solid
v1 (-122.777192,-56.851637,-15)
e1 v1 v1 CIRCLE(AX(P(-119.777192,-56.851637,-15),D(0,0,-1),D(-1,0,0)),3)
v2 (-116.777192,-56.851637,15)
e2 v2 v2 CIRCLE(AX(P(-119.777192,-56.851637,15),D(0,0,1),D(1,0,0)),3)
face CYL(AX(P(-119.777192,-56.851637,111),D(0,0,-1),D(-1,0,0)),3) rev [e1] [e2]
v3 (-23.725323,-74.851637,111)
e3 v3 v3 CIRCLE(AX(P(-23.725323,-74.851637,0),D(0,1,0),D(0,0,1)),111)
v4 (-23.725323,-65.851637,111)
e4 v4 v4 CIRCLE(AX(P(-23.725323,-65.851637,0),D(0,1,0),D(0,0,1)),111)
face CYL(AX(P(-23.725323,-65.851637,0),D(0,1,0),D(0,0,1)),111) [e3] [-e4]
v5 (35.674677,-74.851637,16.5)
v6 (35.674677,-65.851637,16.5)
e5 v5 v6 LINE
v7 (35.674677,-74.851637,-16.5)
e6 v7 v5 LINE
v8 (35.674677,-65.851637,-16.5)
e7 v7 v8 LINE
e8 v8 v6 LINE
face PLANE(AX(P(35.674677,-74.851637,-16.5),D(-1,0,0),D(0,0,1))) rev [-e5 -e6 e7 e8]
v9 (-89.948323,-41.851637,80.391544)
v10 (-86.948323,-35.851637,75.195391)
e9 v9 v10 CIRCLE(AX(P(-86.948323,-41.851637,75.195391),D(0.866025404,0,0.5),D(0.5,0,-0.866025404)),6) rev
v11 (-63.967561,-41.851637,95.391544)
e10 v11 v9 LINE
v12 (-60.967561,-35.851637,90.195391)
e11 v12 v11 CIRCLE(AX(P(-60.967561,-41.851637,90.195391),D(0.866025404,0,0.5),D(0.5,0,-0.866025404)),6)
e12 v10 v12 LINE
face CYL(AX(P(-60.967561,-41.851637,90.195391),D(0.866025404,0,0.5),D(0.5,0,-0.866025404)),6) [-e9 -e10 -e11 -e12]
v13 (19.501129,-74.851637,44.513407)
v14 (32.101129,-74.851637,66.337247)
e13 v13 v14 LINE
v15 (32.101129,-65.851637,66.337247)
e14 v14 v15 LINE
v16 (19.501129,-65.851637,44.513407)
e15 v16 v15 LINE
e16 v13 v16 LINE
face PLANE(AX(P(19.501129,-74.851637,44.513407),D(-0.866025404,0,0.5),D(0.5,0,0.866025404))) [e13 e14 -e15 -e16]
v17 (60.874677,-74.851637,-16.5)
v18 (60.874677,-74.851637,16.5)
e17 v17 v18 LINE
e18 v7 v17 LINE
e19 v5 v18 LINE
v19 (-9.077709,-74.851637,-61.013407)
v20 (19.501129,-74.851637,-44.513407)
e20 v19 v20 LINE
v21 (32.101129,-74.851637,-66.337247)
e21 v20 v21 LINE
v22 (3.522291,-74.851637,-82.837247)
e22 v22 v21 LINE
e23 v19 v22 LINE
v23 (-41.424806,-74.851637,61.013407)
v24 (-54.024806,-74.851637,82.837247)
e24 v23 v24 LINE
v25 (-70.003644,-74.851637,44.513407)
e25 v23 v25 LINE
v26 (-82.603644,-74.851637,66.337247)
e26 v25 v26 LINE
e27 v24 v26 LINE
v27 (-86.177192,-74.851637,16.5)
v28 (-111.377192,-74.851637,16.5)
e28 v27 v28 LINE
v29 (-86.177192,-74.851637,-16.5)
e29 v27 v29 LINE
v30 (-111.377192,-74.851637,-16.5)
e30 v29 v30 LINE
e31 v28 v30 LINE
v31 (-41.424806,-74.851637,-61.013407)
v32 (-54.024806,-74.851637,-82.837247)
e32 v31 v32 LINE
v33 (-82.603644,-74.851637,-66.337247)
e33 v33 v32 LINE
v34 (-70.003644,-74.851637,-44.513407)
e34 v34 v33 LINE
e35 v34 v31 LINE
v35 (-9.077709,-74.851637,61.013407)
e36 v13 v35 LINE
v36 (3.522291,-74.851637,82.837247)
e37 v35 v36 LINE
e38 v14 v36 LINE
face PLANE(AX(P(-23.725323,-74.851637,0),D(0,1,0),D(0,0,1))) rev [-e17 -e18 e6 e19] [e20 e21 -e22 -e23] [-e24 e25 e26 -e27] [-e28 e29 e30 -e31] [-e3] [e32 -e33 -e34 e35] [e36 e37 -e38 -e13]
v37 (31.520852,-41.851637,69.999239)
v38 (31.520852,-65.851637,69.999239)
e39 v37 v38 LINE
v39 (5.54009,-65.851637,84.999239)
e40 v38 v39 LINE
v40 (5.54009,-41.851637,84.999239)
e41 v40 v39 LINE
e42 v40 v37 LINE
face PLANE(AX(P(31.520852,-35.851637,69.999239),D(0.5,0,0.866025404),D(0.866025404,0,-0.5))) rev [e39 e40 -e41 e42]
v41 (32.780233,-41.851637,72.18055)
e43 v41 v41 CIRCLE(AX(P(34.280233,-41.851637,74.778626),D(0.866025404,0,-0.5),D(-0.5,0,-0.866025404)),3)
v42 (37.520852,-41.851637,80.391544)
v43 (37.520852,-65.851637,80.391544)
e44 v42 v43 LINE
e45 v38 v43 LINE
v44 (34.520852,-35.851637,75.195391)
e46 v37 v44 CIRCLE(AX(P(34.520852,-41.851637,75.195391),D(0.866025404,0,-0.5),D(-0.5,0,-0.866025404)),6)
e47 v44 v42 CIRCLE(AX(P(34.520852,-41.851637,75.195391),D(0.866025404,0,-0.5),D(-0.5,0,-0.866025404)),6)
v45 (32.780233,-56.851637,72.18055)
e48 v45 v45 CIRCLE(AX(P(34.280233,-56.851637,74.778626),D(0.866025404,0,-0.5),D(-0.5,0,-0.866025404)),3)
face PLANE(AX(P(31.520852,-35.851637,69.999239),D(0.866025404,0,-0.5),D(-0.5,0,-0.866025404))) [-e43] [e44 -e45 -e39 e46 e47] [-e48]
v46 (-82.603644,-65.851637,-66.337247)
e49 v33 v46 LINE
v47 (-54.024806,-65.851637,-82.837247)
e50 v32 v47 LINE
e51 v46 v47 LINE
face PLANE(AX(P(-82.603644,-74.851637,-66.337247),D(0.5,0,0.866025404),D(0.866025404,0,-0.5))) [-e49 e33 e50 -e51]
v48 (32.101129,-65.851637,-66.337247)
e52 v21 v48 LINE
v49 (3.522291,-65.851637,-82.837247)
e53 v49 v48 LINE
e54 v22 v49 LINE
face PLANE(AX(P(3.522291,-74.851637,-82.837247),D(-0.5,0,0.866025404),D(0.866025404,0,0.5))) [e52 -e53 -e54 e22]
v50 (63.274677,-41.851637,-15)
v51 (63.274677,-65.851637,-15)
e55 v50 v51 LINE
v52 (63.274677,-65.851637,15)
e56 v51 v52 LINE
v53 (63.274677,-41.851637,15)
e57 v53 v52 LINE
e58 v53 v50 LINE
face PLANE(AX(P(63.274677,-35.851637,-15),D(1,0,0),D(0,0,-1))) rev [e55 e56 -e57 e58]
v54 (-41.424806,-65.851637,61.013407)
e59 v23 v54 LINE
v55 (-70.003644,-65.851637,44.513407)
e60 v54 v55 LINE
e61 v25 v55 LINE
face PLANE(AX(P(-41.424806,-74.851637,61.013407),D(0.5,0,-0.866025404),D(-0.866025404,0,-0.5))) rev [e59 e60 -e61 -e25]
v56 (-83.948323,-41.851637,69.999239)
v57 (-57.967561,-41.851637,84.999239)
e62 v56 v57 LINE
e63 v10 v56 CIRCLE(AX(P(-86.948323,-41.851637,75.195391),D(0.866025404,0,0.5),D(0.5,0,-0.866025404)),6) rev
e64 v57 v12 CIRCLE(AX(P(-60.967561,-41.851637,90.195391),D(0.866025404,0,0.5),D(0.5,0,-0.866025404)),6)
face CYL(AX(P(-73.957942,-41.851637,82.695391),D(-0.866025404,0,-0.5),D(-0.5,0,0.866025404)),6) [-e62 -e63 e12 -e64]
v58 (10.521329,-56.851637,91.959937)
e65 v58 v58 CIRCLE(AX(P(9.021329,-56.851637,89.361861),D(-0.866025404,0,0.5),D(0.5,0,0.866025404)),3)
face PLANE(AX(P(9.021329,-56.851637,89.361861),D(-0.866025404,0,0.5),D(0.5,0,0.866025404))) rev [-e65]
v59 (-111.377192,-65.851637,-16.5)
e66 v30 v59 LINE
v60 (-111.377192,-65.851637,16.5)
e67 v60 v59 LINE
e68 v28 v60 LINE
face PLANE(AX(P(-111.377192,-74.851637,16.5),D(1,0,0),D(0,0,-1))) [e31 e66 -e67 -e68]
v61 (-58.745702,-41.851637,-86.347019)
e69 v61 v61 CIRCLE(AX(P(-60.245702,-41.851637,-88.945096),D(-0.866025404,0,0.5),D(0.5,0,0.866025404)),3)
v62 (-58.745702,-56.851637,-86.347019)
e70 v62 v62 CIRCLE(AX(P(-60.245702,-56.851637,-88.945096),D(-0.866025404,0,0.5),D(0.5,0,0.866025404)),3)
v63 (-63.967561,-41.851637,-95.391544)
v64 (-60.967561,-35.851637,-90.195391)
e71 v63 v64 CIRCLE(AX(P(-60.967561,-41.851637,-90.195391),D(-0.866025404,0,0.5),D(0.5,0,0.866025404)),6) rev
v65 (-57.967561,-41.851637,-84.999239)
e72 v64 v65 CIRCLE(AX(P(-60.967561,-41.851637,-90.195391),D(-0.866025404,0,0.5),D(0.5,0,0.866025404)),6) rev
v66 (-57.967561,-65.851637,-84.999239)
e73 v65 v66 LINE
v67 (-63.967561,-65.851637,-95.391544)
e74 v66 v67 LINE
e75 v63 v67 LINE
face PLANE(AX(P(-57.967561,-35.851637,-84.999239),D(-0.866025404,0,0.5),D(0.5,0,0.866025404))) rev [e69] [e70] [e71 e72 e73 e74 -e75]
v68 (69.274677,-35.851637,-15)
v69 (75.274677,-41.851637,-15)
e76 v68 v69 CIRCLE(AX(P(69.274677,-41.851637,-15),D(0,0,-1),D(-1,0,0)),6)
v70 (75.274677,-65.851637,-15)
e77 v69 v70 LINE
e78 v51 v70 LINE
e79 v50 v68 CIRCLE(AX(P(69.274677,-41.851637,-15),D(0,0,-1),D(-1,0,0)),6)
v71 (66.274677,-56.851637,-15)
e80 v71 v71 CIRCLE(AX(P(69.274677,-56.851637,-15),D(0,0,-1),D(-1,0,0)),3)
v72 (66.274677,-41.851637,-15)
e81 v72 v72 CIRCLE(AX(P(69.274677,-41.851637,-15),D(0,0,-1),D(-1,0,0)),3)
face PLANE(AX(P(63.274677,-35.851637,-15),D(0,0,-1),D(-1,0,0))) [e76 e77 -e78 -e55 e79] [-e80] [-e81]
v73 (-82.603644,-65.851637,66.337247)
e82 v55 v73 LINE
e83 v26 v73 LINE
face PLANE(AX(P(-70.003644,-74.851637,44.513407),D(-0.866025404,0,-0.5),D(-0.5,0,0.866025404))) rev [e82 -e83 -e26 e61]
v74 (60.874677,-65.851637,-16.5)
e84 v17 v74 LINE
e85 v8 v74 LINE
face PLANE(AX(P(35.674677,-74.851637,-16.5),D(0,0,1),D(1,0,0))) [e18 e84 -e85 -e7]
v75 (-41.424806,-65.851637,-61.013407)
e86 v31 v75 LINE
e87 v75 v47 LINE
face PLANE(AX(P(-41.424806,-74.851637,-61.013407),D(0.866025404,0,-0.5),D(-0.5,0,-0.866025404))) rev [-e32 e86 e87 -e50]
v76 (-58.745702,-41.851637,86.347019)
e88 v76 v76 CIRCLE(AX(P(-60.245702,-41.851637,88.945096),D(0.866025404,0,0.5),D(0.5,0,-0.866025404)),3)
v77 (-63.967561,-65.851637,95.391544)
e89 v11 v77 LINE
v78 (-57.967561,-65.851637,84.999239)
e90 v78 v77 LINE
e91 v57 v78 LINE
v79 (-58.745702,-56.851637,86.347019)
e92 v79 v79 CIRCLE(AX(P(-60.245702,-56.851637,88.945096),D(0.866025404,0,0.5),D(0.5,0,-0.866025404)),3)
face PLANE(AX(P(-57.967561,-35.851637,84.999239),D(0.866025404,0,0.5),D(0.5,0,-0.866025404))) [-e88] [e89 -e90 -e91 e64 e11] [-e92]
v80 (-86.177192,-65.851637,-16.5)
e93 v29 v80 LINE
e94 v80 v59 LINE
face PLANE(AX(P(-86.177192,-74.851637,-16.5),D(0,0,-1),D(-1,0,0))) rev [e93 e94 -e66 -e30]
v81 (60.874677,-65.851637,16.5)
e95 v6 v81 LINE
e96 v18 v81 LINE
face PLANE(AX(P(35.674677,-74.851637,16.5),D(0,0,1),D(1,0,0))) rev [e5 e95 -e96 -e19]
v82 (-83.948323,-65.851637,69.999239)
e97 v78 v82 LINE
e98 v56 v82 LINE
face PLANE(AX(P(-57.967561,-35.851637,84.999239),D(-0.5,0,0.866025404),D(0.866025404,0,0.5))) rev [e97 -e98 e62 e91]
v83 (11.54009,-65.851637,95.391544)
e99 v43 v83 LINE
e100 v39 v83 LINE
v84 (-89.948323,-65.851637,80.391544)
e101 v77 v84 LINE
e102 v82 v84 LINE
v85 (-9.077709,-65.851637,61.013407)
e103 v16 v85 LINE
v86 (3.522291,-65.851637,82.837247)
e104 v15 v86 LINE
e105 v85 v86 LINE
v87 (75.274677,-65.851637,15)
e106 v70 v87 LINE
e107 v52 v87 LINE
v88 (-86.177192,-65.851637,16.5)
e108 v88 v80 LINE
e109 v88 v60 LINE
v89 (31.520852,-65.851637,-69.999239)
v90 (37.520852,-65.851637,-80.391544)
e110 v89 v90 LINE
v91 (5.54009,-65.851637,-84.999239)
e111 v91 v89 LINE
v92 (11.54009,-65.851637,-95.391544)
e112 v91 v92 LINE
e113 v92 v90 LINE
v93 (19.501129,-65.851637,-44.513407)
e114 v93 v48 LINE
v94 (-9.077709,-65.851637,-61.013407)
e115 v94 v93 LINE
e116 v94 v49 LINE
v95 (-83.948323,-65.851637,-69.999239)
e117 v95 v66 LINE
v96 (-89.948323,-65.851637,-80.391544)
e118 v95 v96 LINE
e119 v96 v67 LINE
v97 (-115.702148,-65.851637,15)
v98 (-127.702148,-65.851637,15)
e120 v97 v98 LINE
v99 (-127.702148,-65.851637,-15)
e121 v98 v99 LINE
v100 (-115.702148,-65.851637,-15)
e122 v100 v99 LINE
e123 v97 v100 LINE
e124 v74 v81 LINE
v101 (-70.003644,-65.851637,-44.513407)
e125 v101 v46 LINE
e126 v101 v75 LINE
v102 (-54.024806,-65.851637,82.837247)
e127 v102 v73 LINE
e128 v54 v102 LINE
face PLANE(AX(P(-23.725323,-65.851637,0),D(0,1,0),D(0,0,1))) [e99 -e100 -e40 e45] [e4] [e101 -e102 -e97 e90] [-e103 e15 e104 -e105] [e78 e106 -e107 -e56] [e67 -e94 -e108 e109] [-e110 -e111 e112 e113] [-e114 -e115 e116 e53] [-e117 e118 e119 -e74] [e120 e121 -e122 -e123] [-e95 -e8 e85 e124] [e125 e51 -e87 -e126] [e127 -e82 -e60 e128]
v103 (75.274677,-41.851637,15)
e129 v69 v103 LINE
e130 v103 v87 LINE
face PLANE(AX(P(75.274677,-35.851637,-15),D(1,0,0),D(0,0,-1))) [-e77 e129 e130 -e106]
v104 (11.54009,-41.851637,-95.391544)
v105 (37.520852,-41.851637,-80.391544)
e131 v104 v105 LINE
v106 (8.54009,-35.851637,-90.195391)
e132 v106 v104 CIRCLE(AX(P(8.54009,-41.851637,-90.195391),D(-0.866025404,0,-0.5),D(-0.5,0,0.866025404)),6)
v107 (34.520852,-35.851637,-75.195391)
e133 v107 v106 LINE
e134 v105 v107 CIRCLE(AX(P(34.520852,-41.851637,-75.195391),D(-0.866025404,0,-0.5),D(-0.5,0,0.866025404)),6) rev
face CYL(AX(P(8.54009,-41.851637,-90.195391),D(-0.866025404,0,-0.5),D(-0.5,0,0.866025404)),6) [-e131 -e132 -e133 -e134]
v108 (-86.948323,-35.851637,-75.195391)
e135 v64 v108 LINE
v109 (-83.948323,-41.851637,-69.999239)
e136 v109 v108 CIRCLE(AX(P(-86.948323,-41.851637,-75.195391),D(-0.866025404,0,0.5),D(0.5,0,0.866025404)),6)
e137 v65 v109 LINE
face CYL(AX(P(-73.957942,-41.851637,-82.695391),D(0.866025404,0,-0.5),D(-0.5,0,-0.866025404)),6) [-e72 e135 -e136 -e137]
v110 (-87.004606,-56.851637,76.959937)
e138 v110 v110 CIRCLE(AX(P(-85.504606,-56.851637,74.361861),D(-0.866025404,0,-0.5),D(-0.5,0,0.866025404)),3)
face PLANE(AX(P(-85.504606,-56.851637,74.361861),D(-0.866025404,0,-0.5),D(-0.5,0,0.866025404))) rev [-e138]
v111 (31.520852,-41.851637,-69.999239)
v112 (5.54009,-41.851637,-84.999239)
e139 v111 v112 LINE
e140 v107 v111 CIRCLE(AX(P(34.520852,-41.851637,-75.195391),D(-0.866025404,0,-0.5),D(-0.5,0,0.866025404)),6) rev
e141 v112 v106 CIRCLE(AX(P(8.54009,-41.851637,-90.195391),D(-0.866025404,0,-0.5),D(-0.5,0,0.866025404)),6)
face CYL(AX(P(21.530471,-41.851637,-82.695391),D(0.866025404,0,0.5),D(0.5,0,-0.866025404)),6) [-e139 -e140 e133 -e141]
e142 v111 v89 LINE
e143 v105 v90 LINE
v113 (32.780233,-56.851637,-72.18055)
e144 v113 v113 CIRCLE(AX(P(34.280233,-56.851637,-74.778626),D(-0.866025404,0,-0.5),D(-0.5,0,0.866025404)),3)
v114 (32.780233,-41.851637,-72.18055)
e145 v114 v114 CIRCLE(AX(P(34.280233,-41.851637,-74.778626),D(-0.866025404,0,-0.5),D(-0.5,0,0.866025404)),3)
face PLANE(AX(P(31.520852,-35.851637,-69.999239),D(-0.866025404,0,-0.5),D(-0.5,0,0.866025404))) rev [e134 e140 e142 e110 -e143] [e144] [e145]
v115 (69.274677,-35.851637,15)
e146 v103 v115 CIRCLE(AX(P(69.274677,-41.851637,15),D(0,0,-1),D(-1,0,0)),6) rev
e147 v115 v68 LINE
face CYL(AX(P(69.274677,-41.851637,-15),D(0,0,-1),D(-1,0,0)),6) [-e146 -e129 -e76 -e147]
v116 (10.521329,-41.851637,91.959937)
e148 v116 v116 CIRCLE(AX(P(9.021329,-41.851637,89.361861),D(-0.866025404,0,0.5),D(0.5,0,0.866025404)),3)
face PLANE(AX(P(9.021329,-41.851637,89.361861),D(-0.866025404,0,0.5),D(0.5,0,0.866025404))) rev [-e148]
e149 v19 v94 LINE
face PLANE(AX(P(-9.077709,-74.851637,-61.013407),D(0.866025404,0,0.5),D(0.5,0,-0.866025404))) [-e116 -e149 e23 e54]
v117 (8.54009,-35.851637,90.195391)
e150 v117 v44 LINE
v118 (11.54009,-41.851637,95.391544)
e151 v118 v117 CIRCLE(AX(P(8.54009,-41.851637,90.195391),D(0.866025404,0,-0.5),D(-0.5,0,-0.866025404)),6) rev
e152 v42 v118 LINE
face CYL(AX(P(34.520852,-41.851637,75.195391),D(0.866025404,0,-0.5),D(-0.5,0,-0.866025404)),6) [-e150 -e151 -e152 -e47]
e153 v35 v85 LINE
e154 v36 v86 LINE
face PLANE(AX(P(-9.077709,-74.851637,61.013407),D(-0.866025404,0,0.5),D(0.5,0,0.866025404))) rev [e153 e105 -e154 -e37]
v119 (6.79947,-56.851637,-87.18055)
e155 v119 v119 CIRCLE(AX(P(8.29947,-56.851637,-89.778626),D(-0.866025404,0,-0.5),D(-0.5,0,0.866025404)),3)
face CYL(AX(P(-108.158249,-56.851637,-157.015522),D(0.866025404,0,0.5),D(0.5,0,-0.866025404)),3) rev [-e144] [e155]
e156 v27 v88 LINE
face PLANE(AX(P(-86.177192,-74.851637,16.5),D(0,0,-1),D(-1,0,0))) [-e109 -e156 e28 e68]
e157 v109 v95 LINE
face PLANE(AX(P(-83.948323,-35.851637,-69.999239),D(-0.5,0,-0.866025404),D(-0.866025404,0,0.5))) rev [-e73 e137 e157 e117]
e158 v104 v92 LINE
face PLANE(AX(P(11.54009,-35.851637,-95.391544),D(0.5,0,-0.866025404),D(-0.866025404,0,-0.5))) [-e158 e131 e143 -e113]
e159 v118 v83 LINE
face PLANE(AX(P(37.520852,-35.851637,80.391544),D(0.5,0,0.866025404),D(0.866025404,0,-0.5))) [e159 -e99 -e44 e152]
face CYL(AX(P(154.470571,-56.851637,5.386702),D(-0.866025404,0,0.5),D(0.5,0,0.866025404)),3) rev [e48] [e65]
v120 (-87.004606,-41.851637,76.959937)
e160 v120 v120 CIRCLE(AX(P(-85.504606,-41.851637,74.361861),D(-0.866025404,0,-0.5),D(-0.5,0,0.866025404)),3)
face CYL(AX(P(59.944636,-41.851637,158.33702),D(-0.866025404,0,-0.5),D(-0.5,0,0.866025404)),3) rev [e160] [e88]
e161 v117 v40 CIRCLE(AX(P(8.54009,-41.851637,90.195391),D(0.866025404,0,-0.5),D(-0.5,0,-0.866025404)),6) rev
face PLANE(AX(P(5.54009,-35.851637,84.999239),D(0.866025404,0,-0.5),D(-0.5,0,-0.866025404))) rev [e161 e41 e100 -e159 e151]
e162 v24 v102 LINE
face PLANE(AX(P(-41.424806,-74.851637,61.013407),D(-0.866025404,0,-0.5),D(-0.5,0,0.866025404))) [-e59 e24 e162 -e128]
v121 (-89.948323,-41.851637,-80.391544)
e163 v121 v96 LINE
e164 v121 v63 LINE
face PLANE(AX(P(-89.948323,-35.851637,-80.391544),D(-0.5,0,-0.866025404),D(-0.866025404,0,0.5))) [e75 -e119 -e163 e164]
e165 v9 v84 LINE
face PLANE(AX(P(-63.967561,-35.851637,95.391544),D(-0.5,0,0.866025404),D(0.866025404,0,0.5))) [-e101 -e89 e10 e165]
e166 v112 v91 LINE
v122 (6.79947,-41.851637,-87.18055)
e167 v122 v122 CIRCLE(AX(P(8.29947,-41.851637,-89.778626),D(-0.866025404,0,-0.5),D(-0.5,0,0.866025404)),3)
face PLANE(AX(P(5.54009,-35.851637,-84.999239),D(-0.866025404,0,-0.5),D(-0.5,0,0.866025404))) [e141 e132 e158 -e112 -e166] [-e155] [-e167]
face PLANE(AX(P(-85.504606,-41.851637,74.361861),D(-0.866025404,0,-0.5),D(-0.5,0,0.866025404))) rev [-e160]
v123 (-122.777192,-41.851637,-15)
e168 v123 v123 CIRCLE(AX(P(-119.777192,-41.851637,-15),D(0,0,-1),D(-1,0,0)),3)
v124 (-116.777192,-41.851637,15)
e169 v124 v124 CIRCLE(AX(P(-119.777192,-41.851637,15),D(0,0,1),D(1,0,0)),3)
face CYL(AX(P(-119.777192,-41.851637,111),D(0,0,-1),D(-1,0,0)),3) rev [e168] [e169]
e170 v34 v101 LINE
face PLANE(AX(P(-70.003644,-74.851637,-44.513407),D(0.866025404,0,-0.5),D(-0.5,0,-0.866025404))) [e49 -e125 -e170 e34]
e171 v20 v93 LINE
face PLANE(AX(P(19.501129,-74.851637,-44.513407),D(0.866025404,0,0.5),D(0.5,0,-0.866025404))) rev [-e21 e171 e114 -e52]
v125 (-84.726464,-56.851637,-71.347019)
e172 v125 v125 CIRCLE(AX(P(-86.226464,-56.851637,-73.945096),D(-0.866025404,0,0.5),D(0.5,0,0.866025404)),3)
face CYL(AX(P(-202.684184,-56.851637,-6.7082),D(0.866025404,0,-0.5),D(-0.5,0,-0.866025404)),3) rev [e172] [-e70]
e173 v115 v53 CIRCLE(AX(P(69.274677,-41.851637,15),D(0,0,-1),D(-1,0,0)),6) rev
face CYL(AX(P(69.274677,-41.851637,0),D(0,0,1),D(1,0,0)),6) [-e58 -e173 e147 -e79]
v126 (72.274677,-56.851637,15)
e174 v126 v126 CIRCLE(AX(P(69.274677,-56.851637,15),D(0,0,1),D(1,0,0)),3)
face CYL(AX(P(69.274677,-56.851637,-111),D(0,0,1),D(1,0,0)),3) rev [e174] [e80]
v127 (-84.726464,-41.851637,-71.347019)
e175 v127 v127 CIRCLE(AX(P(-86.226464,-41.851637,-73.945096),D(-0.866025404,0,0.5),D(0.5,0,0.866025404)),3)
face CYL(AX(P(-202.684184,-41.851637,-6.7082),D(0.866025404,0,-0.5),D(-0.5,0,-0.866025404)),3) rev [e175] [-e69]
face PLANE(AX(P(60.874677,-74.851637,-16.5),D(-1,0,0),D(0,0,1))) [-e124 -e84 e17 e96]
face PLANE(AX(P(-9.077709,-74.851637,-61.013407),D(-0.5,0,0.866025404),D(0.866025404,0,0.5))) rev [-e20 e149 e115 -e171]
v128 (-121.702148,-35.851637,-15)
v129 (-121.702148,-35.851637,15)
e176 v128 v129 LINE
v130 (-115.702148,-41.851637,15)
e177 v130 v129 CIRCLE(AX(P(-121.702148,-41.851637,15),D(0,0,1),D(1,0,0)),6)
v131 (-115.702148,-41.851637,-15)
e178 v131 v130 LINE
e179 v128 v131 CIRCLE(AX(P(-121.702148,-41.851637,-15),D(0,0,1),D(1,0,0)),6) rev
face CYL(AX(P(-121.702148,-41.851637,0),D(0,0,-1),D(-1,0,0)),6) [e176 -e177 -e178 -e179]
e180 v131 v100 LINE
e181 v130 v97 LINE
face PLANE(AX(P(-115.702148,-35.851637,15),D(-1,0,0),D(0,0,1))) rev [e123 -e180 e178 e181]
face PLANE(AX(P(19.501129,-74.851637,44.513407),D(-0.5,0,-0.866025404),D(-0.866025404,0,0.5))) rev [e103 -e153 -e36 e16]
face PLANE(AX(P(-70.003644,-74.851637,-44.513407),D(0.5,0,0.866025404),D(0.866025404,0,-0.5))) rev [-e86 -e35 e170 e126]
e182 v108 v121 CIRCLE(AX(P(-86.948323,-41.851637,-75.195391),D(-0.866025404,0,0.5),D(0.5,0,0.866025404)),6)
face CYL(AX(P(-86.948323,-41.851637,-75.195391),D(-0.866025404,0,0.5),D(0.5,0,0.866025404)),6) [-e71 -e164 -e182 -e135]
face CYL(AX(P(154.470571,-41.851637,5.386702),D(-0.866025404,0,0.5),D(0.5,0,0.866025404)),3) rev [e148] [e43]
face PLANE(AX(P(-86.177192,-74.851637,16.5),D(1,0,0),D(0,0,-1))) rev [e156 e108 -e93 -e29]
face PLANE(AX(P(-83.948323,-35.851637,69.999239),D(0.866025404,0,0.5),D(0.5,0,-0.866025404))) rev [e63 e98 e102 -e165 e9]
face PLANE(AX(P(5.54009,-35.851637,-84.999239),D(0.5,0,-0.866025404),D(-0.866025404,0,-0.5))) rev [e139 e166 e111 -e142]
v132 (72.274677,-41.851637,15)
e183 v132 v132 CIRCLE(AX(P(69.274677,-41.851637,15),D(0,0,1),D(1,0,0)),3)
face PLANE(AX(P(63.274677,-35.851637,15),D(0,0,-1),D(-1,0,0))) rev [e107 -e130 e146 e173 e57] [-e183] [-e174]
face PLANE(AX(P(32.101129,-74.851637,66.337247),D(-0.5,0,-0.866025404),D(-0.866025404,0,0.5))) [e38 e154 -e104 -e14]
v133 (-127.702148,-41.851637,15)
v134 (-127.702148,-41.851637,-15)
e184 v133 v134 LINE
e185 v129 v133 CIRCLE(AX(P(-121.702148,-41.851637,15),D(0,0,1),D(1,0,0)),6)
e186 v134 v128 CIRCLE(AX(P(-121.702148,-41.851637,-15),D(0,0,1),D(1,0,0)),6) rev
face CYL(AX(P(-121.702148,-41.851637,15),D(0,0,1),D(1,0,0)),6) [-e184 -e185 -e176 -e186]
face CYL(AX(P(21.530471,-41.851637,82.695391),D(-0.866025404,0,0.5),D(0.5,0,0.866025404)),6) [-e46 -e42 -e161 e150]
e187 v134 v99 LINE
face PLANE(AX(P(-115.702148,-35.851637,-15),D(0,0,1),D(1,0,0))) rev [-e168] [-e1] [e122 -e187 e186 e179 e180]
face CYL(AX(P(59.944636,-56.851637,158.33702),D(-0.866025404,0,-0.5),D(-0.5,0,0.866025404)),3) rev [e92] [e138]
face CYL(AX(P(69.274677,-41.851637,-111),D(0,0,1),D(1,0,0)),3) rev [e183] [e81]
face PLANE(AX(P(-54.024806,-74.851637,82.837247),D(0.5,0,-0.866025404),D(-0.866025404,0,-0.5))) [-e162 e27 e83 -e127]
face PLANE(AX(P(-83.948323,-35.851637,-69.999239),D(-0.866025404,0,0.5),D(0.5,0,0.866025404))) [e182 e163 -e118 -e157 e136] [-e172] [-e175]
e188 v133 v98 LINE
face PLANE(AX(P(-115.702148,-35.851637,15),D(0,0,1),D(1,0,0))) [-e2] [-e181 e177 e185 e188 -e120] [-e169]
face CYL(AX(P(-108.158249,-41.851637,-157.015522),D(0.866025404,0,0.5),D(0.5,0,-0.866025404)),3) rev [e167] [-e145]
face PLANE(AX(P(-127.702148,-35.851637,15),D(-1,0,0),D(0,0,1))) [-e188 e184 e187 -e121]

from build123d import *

# Parameters (mm, degrees)
SKETCH_6_W                     = 111
SKETCH_6_H                     = 9
SKETCH_7_W                     = 12
SKETCH_7_H                     = 30
EXTRUDE_5_DEPTH                = 30
SKETCH_8_R                     = 3
CUT_EXTRUDE_2_DEPTH            = 200.07204757
FILLET_2_R                     = 6
SKETCH_9_W                     = 25.2
SKETCH_9_H                     = 33
CUT_EXTRUDE_3_DEPTH            = 178.121180423
PATTERN_START                  = -15
PATTERN_CIRCULAR_3_OUTLINE_R   = 3
PATTERN_CIRCULAR_3_DEPTH       = 30
PATTERN_START_2                = -37.701760736
PATTERN_CIRCULAR_3_2_OUTLINE_R = 3
PATTERN_CIRCULAR_3_2_DEPTH     = 30
PATTERN_CIRCULAR_3_3_OUTLINE_R = 3
PATTERN_CIRCULAR_3_3_DEPTH     = 0.833530395
PATTERN_CIRCULAR_3_4_OUTLINE_R = 3
PATTERN_CIRCULAR_3_4_DEPTH     = 30
PATTERN_CIRCULAR_3_5_OUTLINE_R = 3
PATTERN_CIRCULAR_3_5_DEPTH     = 0.833530395
PATTERN_START_3                = -16.5
PATTERN_CIRCULAR_3_6_OUTLINE_W = 25.2
PATTERN_CIRCULAR_3_6_OUTLINE_H = 9
PATTERN_CIRCULAR_3_6_DEPTH     = 33
PATTERN_START_4                = -38.368230341
PATTERN_CIRCULAR_3_7_OUTLINE_W = 25.2
PATTERN_CIRCULAR_3_7_OUTLINE_H = 9
PATTERN_CIRCULAR_3_7_DEPTH     = 33
PATTERN_CIRCULAR_3_8_OUTLINE_W = 25.2
PATTERN_CIRCULAR_3_8_OUTLINE_H = 9
PATTERN_CIRCULAR_3_8_DEPTH     = 33


# Read off the part's stored shape, not the designer's step: 阵列(圆周)3
with BuildPart() as part:
    # 草图6 → 旋转3 (revolve)
    with BuildSketch(Plane.XY, mode=Mode.PRIVATE) as revolve_3_sk:
        with Locations((31.774677383, -70.351637053)):
            Rectangle(SKETCH_6_W, SKETCH_6_H)
    revolve(revolve_3_sk.sketch.rotate(Axis((-23.725322617, -65.851637053, 0), (0, -1, 0)), 90), axis=Axis((-23.725322617, -65.851637053, 0), (0, -1, 0)))

    # 草图7 → 凸台-拉伸5 (add)
    with BuildSketch(Plane(origin=(0, -65.851637053, 0), x_dir=(1, 0, 0), z_dir=(0, 1, 0))):
        with Locations((69.274677383, 0)):
            Rectangle(SKETCH_7_W, SKETCH_7_H)
    extrude(amount=EXTRUDE_5_DEPTH)

    # 草图8 → 切除-拉伸2 (cut, through all)
    with BuildSketch(Plane.XY.offset(15)):
        with Locations((69.274677383, -41.851637053)):
            Circle(SKETCH_8_R)
        with Locations((69.274677383, -56.851637053)):
            Circle(SKETCH_8_R)
    extrude(amount=-CUT_EXTRUDE_2_DEPTH, mode=Mode.SUBTRACT)

    # 圆角2
    fillet_2_edges = [part.edges().sort_by_distance(p)[0] for p in [
        (63.274677383, -35.851637053, 0),
        (75.274677383, -35.851637053, 0),
    ]]
    fillet(fillet_2_edges, radius=FILLET_2_R - 0.0001)  # a hair under: the kernel refuses the full size

    # 草图9 → 切除-拉伸3 (cut, through all)
    with BuildSketch(Plane(origin=(0, -65.851637053, 0), x_dir=(1, 0, 0), z_dir=(0, 1, 0))):
        with Locations((48.274677383, 0)):
            Rectangle(SKETCH_9_W, SKETCH_9_H)
    extrude(amount=-CUT_EXTRUDE_3_DEPTH, mode=Mode.SUBTRACT)

    # 阵列(圆周)3 outline → 阵列(圆周)3 (add)
    with BuildSketch(Plane.XY.offset(PATTERN_START)):
        with BuildLine():
            ThreePointArc((-121.702148071, -35.851637053), (-125.944788758, -37.608996366), (-127.702148071, -41.851637053))
            Line((-127.702148071, -41.851637053), (-127.702148071, -65.851637053))
            Line((-127.702148071, -65.851637053), (-115.702148071, -65.851637053))
            Line((-115.702148071, -65.851637053), (-115.702148071, -41.851637053))
            ThreePointArc((-115.702148071, -41.851637053), (-117.459507384, -37.608996366), (-121.702148071, -35.851637053))
        make_face()
        with Locations((-119.777192079, -56.851637053)):
            Circle(PATTERN_CIRCULAR_3_OUTLINE_R, mode=Mode.SUBTRACT)
        with Locations((-119.777192079, -41.851637053)):
            Circle(PATTERN_CIRCULAR_3_OUTLINE_R, mode=Mode.SUBTRACT)
    extrude(amount=PATTERN_CIRCULAR_3_DEPTH)

    # Pattern Circular 3 2 outline → Pattern Circular 3 2 (add)
    # profile 1 of 2: a face of its own
    with BuildSketch(Plane(origin=(0, 0, 0), x_dir=(0.49999999999999767, 0, -0.86602540378444), z_dir=(0.8660254037844399, 0, 0.49999999999999795)).offset(PATTERN_START_2)):
        with BuildLine():
            Line((76.381545055, -65.851637053), (88.381545055, -65.851637053))
            Line((88.381545055, -65.851637053), (88.381545055, -41.851637053))
            ThreePointArc((88.381545055, -41.851637053), (86.624185742, -37.608996366), (82.381545055, -35.851637053))
            ThreePointArc((82.381545055, -35.851637053), (78.138904368, -37.608996366), (76.381545055, -41.851637053))
            Line((76.381545055, -41.851637053), (76.381545055, -65.851637053))
        make_face()
        with Locations((81.900306057, -56.851637053)):
            Circle(PATTERN_CIRCULAR_3_2_OUTLINE_R, mode=Mode.SUBTRACT)
        with Locations((81.900306057, -41.851637053)):
            Circle(PATTERN_CIRCULAR_3_2_OUTLINE_R, mode=Mode.SUBTRACT)
    # profile 2 of 2: a face of its own
    with BuildSketch(Plane(origin=(0, 0, 0), x_dir=(0.49999999999999767, 0, -0.86602540378444), z_dir=(0.8660254037844399, 0, 0.49999999999999795)).offset(PATTERN_START_2)):
        with BuildLine():
            Line((-114.595280399, -65.851637053), (-102.595280399, -65.851637053))
            Line((-102.595280399, -65.851637053), (-102.595280399, -41.851637053))
            ThreePointArc((-102.595280399, -41.851637053), (-104.352639712, -37.608996366), (-108.595280399, -35.851637053))
            ThreePointArc((-108.595280399, -35.851637053), (-112.837921086, -37.608996366), (-114.595280399, -41.851637053))
            Line((-114.595280399, -41.851637053), (-114.595280399, -65.851637053))
        make_face()
        with Locations((-107.151563405, -56.851637053)):
            Circle(PATTERN_CIRCULAR_3_2_OUTLINE_R, mode=Mode.SUBTRACT)
        with Locations((-107.151563405, -41.851637053)):
            Circle(PATTERN_CIRCULAR_3_2_OUTLINE_R, mode=Mode.SUBTRACT)
    extrude(amount=PATTERN_CIRCULAR_3_2_DEPTH)

    # Pattern Circular 3 3 outline → Pattern Circular 3 3 (add)
    with BuildSketch(Plane(origin=(0, 0, 0), x_dir=(0.49999999999999767, 0, -0.86602540378444), z_dir=(0.8660254037844399, 0, 0.49999999999999795)).offset(PATTERN_START_2)):
        with Locations((-107.151563405, -56.851637053)):
            Circle(PATTERN_CIRCULAR_3_3_OUTLINE_R)
        with Locations((-107.151563405, -41.851637053)):
            Circle(PATTERN_CIRCULAR_3_3_OUTLINE_R)
    extrude(amount=PATTERN_CIRCULAR_3_3_DEPTH)

    # Pattern Circular 3 4 outline → Pattern Circular 3 4 (add)
    # profile 1 of 2: a face of its own
    with BuildSketch(Plane(origin=(0, 0, 0), x_dir=(0.500000000000004, 0, 0.8660254037844363), z_dir=(0.8660254037844363, 0, -0.5000000000000042)).offset(PATTERN_START_2)):
        with BuildLine():
            Line((-102.595280399, 65.851637053), (-114.595280399, 65.851637053))
            Line((-114.595280399, 65.851637053), (-114.595280399, 41.851637053))
            ThreePointArc((-114.595280399, 41.851637053), (-112.837921086, 37.608996366), (-108.595280399, 35.851637053))
            ThreePointArc((-108.595280399, 35.851637053), (-104.352639712, 37.608996366), (-102.595280399, 41.851637053))
            Line((-102.595280399, 41.851637053), (-102.595280399, 65.851637053))
        make_face()
        with Locations((-107.151563405, 41.851637053)):
            Circle(PATTERN_CIRCULAR_3_4_OUTLINE_R, mode=Mode.SUBTRACT)
        with Locations((-107.151563405, 56.851637053)):
            Circle(PATTERN_CIRCULAR_3_4_OUTLINE_R, mode=Mode.SUBTRACT)
    # profile 2 of 2: a face of its own
    with BuildSketch(Plane(origin=(0, 0, 0), x_dir=(0.500000000000004, 0, 0.8660254037844363), z_dir=(0.8660254037844363, 0, -0.5000000000000042)).offset(PATTERN_START_2)):
        with BuildLine():
            Line((88.381545055, 65.851637053), (76.381545055, 65.851637053))
            Line((76.381545055, 65.851637053), (76.381545055, 41.851637053))
            ThreePointArc((76.381545055, 41.851637053), (78.138904368, 37.608996366), (82.381545055, 35.851637053))
            ThreePointArc((82.381545055, 35.851637053), (86.624185742, 37.608996366), (88.381545055, 41.851637053))
            Line((88.381545055, 41.851637053), (88.381545055, 65.851637053))
        make_face()
        with Locations((81.900306057, 41.851637053)):
            Circle(PATTERN_CIRCULAR_3_4_OUTLINE_R, mode=Mode.SUBTRACT)
        with Locations((81.900306057, 56.851637053)):
            Circle(PATTERN_CIRCULAR_3_4_OUTLINE_R, mode=Mode.SUBTRACT)
    extrude(amount=PATTERN_CIRCULAR_3_4_DEPTH)

    # Pattern Circular 3 5 outline → Pattern Circular 3 5 (add)
    with BuildSketch(Plane(origin=(0, 0, 0), x_dir=(0.500000000000004, 0, 0.8660254037844363), z_dir=(0.8660254037844363, 0, -0.5000000000000042)).offset(PATTERN_START_2)):
        with Locations((81.900306057, 56.851637053)):
            Circle(PATTERN_CIRCULAR_3_5_OUTLINE_R)
        with Locations((81.900306057, 41.851637053)):
            Circle(PATTERN_CIRCULAR_3_5_OUTLINE_R)
    extrude(amount=PATTERN_CIRCULAR_3_5_DEPTH)

    # Pattern Circular 3 6 outline → Pattern Circular 3 6 (cut)
    with BuildSketch(Plane.XY.offset(PATTERN_START_3)):
        with Locations((-98.777192079, -70.351637053)):
            Rectangle(PATTERN_CIRCULAR_3_6_OUTLINE_W, PATTERN_CIRCULAR_3_6_OUTLINE_H)
    extrude(amount=PATTERN_CIRCULAR_3_6_DEPTH, mode=Mode.SUBTRACT)

    # Pattern Circular 3 7 outline → Pattern Circular 3 7 (cut)
    with BuildSketch(Plane(origin=(0, 0, 0), x_dir=(0.49999999999999767, 0, -0.86602540378444), z_dir=(0.8660254037844399, 0, 0.49999999999999795)).offset(PATTERN_START_4)):
        with Locations((60.900306057, -70.351637053)):
            Rectangle(PATTERN_CIRCULAR_3_7_OUTLINE_W, PATTERN_CIRCULAR_3_7_OUTLINE_H)
        with Locations((-86.151563405, -70.351637053)):
            Rectangle(PATTERN_CIRCULAR_3_7_OUTLINE_W, PATTERN_CIRCULAR_3_7_OUTLINE_H)
    extrude(amount=PATTERN_CIRCULAR_3_7_DEPTH, mode=Mode.SUBTRACT)

    # Pattern Circular 3 8 outline → Pattern Circular 3 8 (cut)
    with BuildSketch(Plane(origin=(0, 0, 0), x_dir=(0.500000000000004, 0, 0.8660254037844363), z_dir=(0.8660254037844363, 0, -0.5000000000000042)).offset(PATTERN_START_4)):
        with Locations((-86.151563405, 70.351637053)):
            Rectangle(PATTERN_CIRCULAR_3_8_OUTLINE_W, PATTERN_CIRCULAR_3_8_OUTLINE_H)
        with Locations((60.900306057, 70.351637053)):
            Rectangle(PATTERN_CIRCULAR_3_8_OUTLINE_W, PATTERN_CIRCULAR_3_8_OUTLINE_H)
    extrude(amount=PATTERN_CIRCULAR_3_8_DEPTH, mode=Mode.SUBTRACT)


solid = part.part
